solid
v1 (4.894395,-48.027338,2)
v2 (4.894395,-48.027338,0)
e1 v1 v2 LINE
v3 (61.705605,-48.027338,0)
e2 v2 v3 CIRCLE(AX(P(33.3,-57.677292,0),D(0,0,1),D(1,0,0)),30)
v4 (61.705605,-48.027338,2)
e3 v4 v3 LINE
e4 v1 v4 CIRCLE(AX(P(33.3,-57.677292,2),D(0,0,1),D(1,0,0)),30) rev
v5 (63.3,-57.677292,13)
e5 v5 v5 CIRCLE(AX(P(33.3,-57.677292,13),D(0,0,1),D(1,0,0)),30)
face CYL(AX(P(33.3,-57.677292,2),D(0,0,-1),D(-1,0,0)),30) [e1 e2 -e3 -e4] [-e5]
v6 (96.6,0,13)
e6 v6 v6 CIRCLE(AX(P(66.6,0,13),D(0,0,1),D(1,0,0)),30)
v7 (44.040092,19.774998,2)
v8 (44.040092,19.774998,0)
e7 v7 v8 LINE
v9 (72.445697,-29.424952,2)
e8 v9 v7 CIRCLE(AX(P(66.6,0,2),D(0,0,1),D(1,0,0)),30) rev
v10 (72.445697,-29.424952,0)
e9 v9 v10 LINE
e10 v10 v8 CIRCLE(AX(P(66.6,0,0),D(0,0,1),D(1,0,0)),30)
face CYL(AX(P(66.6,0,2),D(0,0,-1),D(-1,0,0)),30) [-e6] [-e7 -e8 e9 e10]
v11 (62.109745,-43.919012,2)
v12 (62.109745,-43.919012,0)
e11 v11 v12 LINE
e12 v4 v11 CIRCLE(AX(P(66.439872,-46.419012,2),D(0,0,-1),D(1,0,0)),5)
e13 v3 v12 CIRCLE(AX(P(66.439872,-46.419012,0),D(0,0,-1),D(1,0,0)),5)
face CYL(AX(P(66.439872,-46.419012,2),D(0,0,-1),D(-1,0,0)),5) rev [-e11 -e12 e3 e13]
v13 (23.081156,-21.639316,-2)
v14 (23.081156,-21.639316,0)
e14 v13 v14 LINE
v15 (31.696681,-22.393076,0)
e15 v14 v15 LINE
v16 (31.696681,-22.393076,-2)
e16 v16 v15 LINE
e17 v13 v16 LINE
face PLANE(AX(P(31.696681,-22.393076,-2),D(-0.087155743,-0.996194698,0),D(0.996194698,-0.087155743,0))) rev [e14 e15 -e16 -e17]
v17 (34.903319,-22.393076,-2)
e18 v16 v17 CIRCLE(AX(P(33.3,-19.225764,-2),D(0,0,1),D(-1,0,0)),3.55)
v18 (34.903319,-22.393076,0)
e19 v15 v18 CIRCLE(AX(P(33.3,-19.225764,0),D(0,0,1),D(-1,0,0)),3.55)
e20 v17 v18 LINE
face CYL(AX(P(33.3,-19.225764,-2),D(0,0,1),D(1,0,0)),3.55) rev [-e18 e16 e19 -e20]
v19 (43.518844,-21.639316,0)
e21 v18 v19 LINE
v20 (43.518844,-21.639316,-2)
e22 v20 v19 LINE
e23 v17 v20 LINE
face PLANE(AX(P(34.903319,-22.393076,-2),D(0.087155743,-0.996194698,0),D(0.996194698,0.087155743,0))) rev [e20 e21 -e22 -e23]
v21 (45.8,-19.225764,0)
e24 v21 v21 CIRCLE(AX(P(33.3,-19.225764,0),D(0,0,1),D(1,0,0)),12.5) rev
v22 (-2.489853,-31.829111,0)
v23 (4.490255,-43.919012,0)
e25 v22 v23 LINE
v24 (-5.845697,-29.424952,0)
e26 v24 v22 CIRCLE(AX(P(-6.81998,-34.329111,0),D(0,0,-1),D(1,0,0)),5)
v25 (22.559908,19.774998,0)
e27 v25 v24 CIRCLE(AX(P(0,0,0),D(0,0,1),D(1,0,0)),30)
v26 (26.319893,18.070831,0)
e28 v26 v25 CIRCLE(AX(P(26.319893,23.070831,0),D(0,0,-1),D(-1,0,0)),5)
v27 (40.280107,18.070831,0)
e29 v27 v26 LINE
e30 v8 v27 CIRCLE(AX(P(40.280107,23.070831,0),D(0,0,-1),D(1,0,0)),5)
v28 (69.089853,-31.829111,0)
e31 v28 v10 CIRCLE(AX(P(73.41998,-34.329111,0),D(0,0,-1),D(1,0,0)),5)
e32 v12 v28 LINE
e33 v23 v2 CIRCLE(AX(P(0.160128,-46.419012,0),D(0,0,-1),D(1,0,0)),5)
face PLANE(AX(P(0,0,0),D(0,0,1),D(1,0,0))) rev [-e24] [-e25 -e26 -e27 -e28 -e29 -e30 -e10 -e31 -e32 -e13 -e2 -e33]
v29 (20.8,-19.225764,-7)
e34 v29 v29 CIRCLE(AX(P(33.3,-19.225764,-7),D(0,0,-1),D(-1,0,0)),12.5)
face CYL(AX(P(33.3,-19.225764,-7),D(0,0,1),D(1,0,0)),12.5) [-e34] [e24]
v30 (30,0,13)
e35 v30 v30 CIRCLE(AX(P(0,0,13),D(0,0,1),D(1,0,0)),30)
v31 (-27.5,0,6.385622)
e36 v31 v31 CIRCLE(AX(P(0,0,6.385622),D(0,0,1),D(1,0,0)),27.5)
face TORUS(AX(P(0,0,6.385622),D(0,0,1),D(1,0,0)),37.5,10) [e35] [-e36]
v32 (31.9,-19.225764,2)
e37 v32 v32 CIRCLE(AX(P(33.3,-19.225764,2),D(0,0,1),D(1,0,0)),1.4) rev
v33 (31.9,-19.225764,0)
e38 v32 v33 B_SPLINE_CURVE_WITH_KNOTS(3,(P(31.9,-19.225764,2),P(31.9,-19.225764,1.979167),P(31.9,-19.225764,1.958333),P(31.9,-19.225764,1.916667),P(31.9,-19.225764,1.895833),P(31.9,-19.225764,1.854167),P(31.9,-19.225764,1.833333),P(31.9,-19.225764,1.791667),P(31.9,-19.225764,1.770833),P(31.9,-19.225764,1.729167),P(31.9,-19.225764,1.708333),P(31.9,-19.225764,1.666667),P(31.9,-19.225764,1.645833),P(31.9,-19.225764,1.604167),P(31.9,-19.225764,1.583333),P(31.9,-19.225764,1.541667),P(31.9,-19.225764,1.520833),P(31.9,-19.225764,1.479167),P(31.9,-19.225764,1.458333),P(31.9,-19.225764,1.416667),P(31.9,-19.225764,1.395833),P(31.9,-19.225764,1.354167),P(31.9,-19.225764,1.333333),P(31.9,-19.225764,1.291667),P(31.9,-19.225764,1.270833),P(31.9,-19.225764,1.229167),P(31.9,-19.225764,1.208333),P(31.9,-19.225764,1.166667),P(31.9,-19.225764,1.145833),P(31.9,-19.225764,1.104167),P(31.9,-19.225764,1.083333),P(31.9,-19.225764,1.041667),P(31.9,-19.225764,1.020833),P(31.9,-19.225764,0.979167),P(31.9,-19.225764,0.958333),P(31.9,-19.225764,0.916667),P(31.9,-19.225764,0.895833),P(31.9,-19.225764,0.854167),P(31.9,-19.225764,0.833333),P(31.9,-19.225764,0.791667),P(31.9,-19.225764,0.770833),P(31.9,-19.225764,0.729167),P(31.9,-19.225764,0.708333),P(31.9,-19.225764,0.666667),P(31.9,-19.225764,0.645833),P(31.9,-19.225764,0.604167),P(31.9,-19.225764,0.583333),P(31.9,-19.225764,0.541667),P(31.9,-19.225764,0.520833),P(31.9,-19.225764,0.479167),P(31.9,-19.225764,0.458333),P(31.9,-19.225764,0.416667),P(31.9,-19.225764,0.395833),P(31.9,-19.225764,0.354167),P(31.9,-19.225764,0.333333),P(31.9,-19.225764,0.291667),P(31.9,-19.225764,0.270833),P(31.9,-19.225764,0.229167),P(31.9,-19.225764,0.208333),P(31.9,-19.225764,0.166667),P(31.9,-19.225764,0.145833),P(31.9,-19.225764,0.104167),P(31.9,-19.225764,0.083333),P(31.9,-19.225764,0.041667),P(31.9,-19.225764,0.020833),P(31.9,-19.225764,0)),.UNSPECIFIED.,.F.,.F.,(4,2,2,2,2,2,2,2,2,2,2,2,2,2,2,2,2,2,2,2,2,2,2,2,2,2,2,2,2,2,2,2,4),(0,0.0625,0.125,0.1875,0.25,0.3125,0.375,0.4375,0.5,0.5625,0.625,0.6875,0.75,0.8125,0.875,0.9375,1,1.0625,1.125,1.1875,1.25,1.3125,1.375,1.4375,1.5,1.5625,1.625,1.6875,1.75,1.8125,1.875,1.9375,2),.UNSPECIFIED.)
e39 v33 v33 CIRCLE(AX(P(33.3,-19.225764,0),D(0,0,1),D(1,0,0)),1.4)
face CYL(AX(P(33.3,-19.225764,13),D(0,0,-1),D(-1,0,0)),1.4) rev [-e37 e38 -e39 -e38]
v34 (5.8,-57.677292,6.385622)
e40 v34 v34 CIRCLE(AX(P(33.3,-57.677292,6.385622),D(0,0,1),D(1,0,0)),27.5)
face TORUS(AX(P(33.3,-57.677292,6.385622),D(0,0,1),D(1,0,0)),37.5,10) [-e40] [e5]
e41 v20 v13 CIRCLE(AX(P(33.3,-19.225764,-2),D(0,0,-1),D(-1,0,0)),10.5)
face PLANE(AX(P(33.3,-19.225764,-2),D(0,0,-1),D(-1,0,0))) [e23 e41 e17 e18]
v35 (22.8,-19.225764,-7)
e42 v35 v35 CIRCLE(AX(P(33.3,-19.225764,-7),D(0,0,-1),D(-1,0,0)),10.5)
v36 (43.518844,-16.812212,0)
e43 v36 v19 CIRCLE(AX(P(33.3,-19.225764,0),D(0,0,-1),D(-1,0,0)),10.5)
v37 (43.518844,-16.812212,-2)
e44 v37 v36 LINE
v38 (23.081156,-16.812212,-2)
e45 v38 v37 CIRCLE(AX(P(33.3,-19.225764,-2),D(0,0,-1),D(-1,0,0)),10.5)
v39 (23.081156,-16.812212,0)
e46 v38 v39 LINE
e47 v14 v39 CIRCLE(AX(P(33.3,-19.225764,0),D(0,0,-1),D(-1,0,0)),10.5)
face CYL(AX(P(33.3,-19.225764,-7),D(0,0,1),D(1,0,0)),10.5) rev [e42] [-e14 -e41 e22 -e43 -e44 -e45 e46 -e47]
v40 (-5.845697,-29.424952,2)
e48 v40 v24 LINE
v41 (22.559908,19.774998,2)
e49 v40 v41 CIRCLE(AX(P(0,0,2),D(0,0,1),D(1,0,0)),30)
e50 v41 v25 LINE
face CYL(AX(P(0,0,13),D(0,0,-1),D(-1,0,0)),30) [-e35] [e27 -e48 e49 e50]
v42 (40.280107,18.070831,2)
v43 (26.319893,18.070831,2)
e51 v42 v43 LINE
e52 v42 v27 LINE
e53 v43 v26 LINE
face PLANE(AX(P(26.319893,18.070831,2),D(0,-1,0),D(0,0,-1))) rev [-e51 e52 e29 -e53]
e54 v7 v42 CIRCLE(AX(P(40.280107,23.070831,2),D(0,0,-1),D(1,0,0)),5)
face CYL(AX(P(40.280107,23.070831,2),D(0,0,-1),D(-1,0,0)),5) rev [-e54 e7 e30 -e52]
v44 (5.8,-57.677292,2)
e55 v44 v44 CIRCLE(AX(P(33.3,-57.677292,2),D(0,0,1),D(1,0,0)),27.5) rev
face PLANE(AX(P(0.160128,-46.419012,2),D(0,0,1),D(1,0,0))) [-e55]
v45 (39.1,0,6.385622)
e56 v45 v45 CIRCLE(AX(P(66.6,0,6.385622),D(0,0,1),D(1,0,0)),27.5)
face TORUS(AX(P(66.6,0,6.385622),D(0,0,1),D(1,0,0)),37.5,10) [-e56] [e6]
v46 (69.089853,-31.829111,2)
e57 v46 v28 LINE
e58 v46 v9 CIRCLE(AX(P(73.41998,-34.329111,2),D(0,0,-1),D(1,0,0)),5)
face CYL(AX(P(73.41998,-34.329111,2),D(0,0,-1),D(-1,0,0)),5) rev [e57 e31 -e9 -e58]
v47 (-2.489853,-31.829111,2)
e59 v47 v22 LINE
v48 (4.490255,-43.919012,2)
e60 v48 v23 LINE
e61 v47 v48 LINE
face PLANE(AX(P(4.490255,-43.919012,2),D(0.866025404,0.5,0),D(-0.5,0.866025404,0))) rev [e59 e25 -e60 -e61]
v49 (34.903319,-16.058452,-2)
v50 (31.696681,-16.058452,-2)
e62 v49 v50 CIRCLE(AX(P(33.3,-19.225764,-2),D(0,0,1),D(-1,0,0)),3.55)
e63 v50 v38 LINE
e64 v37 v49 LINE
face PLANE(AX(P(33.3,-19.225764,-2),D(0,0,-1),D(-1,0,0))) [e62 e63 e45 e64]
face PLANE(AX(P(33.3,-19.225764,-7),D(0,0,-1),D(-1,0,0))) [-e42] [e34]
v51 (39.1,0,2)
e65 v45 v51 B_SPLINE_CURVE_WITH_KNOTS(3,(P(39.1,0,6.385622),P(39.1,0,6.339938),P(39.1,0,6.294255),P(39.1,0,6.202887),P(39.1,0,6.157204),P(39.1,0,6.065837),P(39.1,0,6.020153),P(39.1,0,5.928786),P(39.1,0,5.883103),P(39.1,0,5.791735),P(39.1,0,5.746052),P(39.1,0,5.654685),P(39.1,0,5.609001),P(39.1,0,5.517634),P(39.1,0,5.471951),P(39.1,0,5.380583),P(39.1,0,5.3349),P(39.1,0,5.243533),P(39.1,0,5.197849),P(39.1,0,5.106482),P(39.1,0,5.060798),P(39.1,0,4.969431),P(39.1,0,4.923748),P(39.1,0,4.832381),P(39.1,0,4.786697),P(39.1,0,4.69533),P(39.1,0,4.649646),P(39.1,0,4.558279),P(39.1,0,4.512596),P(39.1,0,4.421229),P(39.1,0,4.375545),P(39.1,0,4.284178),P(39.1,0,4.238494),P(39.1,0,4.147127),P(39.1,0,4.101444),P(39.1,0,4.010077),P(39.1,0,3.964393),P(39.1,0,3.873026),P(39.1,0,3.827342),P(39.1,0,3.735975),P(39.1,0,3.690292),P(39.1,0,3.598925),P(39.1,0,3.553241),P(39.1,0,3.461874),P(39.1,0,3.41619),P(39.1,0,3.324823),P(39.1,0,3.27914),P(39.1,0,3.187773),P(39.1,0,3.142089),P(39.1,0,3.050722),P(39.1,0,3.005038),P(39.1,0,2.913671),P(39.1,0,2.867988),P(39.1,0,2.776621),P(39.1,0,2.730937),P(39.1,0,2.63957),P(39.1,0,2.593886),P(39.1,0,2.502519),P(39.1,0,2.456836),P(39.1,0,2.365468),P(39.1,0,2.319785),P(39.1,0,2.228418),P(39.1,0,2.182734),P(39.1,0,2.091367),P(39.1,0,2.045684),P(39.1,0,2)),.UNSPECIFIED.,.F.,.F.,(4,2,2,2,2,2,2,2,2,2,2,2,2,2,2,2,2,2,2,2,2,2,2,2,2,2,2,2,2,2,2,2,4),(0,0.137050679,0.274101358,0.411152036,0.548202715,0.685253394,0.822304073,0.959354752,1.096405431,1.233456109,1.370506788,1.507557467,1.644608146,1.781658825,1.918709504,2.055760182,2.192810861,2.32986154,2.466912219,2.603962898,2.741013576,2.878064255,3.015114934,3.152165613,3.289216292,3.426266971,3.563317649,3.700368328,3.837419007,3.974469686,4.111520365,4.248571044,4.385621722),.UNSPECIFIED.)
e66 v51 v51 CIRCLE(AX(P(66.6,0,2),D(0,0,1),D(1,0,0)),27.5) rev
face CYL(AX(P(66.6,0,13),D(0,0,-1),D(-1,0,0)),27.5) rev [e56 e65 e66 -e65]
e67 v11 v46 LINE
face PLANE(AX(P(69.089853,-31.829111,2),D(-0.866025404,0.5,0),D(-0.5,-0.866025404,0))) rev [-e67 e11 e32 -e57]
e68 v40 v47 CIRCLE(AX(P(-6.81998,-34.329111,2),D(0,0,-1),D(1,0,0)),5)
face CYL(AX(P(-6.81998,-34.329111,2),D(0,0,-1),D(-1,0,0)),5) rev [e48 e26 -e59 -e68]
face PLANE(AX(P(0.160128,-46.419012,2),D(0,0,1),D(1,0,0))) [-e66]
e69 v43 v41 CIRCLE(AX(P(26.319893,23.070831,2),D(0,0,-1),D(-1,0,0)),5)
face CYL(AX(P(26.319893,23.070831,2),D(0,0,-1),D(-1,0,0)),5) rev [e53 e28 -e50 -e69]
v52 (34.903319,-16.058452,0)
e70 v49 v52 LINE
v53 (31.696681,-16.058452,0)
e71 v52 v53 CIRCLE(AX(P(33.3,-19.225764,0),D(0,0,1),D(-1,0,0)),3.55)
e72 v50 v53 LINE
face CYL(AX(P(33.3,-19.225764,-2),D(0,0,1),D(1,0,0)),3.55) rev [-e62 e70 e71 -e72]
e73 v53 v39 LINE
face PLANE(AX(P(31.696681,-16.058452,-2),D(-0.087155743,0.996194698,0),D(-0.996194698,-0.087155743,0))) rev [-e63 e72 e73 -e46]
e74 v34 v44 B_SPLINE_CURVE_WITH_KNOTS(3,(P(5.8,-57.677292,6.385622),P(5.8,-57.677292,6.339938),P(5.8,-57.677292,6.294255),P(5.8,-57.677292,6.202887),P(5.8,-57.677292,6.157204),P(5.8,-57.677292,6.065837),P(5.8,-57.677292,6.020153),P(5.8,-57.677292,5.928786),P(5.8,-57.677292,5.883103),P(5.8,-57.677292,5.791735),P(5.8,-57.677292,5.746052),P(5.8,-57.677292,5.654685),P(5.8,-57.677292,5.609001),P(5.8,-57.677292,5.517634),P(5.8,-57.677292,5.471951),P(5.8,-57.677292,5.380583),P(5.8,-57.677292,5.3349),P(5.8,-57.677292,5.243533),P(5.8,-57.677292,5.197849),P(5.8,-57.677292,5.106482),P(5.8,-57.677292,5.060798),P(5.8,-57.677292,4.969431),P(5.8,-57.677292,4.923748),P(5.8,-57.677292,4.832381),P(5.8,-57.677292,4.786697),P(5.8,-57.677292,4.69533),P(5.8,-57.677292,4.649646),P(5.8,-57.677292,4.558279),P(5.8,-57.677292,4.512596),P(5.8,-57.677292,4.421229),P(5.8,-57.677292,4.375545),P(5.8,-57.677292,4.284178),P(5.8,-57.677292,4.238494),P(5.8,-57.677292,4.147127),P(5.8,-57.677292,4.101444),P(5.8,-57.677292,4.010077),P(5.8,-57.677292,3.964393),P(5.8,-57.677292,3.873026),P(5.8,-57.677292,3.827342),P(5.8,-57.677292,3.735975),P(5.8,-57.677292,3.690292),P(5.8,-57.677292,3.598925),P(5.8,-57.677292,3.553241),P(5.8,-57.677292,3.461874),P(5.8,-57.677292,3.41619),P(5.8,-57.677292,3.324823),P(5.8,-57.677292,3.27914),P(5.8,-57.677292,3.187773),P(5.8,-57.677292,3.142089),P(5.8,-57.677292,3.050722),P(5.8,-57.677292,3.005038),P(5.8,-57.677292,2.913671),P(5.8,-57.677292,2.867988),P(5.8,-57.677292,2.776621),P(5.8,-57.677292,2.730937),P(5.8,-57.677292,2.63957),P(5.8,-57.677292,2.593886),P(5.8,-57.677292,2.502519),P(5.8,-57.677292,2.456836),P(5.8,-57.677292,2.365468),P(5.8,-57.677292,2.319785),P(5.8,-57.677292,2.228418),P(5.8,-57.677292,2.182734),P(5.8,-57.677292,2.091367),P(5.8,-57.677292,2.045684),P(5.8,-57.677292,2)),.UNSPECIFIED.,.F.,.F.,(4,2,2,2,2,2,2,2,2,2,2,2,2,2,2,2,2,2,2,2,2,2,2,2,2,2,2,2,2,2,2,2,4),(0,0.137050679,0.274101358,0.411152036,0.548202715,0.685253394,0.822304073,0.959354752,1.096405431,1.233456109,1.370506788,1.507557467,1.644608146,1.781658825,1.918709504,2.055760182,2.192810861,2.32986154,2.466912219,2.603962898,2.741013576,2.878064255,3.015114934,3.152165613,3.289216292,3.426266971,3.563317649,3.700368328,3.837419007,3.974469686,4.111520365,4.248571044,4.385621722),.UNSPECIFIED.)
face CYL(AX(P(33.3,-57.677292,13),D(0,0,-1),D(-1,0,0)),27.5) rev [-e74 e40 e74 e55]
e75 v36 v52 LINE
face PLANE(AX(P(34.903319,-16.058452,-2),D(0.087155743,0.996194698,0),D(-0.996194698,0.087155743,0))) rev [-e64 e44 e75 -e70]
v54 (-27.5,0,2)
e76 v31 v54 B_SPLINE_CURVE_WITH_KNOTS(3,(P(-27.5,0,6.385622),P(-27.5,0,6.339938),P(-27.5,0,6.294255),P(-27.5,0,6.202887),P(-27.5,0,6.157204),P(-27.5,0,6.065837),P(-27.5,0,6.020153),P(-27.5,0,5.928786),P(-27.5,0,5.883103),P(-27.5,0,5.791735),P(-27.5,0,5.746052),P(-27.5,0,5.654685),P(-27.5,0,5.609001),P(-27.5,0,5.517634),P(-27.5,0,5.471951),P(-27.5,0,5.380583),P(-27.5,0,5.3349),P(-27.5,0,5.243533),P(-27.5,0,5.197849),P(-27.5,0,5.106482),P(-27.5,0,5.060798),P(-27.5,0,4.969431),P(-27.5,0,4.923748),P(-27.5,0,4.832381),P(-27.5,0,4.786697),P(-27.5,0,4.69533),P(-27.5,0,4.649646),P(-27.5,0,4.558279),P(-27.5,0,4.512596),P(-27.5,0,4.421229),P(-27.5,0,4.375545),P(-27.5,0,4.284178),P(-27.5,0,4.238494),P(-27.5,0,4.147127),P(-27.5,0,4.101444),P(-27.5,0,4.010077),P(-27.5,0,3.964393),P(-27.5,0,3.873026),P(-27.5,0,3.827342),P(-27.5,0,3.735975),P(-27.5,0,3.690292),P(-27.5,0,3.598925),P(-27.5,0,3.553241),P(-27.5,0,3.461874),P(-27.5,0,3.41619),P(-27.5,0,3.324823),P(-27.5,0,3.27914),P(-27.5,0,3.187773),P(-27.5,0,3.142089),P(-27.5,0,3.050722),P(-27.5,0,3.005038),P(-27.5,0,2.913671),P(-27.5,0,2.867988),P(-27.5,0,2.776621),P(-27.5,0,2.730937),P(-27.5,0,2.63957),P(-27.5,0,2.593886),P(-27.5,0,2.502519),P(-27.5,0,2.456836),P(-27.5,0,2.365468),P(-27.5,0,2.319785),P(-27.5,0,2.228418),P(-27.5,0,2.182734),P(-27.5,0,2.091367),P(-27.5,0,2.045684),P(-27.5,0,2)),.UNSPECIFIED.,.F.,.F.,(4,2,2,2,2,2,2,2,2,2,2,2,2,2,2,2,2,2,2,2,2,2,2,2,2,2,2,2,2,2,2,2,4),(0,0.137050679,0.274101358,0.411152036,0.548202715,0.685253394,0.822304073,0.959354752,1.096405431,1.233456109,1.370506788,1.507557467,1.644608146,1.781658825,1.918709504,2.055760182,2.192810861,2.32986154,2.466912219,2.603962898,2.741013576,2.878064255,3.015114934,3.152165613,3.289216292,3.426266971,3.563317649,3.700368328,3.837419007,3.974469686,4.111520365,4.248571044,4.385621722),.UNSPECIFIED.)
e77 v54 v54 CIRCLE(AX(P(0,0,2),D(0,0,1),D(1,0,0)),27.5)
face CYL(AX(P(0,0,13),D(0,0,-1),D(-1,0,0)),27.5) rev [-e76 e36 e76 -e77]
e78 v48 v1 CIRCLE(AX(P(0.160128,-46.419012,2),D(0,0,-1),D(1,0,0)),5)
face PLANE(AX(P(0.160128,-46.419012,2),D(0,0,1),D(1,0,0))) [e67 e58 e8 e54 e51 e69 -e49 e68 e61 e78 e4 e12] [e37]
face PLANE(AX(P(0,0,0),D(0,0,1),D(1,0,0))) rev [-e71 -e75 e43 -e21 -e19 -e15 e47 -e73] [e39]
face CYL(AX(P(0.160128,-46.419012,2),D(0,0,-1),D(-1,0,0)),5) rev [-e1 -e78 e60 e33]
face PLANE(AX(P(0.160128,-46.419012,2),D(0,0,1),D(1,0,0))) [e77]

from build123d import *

# Parameters (mm, degrees)
SKETCH_1_R          = 30
SKETCH_1_R_2        = 27.5
EXTRUDE_1_DEPTH     = 13
SKETCH_1_R_3        = 29.999999999999996
EXTRUDE_1_2_DEPTH   = 13
EXTRUDE_1_3_DEPTH   = 13
EXTRUDE_2_DEPTH     = 2
SKETCH_3_R          = 1.3999999999999955
CUT_EXTRUDE_5_DEPTH = 132.10250765535577
FILLET_1_R          = 10
SKETCH_5_R          = 12.500000000000002
SKETCH_5_R_2        = 10.5
EXTRUDE_3_DEPTH     = 7
EXTRUDE_4_DEPTH     = 2


with BuildPart() as part:
    # 草图1 → 凸台-拉伸1 (new body)
    with BuildSketch(Plane.XY):
        with Locations(Location((0, 0, 0), (0, 0, 180))):
            Circle(SKETCH_1_R)
        with Locations(Location((0, 0, 0), (0, 0, 180))):
            Circle(SKETCH_1_R_2, mode=Mode.SUBTRACT)
    extrude(amount=EXTRUDE_1_DEPTH)



with BuildPart() as body_2:
    # 草图1 → Extrude 1 2 (new body)
    with BuildSketch(Plane.XY):
        with Locations(Location((66.6, 0, 0), (0, 0, 180))):
            Circle(SKETCH_1_R_3)
        with Locations(Location((66.6, 0, 0), (0, 0, 180))):
            Circle(SKETCH_1_R_2, mode=Mode.SUBTRACT)
    extrude(amount=EXTRUDE_1_2_DEPTH)


with BuildPart() as body_3:
    # 草图1 → Extrude 1 3 (new body)
    with BuildSketch(Plane.XY):
        with Locations(Location((33.30000000000001, -57.6772918920436, 0), (0, 0, 180))):
            Circle(SKETCH_1_R_3)
        with Locations(Location((33.30000000000001, -57.6772918920436, 0), (0, 0, 180))):
            Circle(SKETCH_1_R_2, mode=Mode.SUBTRACT)
    extrude(amount=EXTRUDE_1_3_DEPTH)


with BuildPart() as part_1:
    add(part.part)

    add(body_2.part)  # 凸台-拉伸2 merges body 2

    add(body_3.part)  # 凸台-拉伸2 merges body 3
    # 草图2 → 凸台-拉伸2 (add)
    with BuildSketch(Plane.XY):
        with BuildLine():
            Line((26.3198925252566, 18.070831312697457), (40.280107474743396, 18.070831312697457))
            ThreePointArc((40.280107474743396, 18.070831312697457), (42.3441853289733, 18.516758123597654), (44.04009212120862, 19.77499826802639))
            ThreePointArc((44.04009212120862, 19.77499826802639), (92.58076211353317, 15), (72.44569692050842, -29.424952464083248))
            ThreePointArc((72.44569692050842, -29.424952464083248), (70.50807559525407, -30.264530756395246), (69.08985272167097, -31.829111208097117))
            Line((69.08985272167097, -31.829111208097117), (62.10974524692759, -43.91901199664395))
            ThreePointArc((62.10974524692759, -43.91901199664395), (61.46389026628078, -45.92951925924603), (61.70560479929982, -48.027337695986766))
            ThreePointArc((61.70560479929982, -48.027337695986766), (33.300000000000004, -87.6772918920436), (4.894395200700185, -48.02733769598677))
            ThreePointArc((4.894395200700185, -48.02733769598677), (5.13610973371921, -45.92951925924604), (4.4902547530724135, -43.91901199664397))
            Line((4.4902547530724135, -43.91901199664397), (-2.489852721670984, -31.829111208097103))
            ThreePointArc((-2.489852721670984, -31.829111208097103), (-3.9080755952540875, -30.264530756395228), (-5.845696920508439, -29.42495246408323))
            ThreePointArc((-5.845696920508439, -29.42495246408323), (-25.980762113533153, 15.000000000000009), (22.55990787879137, 19.77499826802639))
            ThreePointArc((22.55990787879137, 19.77499826802639), (24.25581467102669, 18.516758123597654), (26.3198925252566, 18.070831312697457))
        make_face()
    extrude(amount=EXTRUDE_2_DEPTH)

    # 草图3 → 切除-拉伸5 (cut, through all)
    with BuildSketch(Plane.XY):
        with Locations(Location((33.3, -19.225763964014533, 0), (0, 0, 180))):
            Circle(SKETCH_3_R)
    extrude(amount=CUT_EXTRUDE_5_DEPTH, mode=Mode.SUBTRACT)

    # 圆角1
    # the kernel refuses this fillet: 10 mm, written as the material it takes off along each edge
    with BuildSketch(Plane(origin=(0, 0, 13), x_dir=(-1, 1.2e-16, 0), z_dir=(1.2e-16, 1, 0))) as fillet_1_piece_1:
        with BuildLine():
            CenterArc((37.5, -6.614378277661482), FILLET_1_R, 138.59037789072914, 41.409622109270856)
            Line((27.5, -6.614378277661482), (27.3, -6.614378277661482))
            Line((27.3, -6.614378277661482), (27.3, 0))
            Line((27.3, 0), (27.5, 0.1999999999999993))
            ThreePointArc((27.5, 0.1999999999999993), (28.75, 0.1999999999999993), (29.85, 0.1322875655532254))
            Line((29.85, 0.1322875655532254), (30, -3.55e-15))
        make_face()
    revolve(axis=Axis((0, 0, 13), (0, 0, 1)), mode=Mode.SUBTRACT)
    with BuildSketch(Plane(origin=(66.6, 0, 13), x_dir=(-1, 1.2e-16, 0), z_dir=(1.2e-16, 1, 0))) as fillet_1_piece_2:
        with BuildLine():
            CenterArc((37.5, -6.614378277661482), FILLET_1_R, 138.59037789072914, 41.409622109270856)
            Line((27.5, -6.614378277661482), (27.299999999999997, -6.614378277661482))
            Line((27.299999999999997, -6.614378277661482), (27.299999999999997, 0))
            Line((27.299999999999997, 0), (27.5, 0.1999999999999993))
            ThreePointArc((27.5, 0.1999999999999993), (28.75, 0.1999999999999993), (29.85, 0.1322875655532254))
            Line((29.85, 0.1322875655532254), (30, -3.55e-15))
        make_face()
    revolve(axis=Axis((66.6, 0, 13), (0, 0, 1)), mode=Mode.SUBTRACT)
    with BuildSketch(Plane(origin=(33.30000000000001, -57.6772918920436, 13), x_dir=(-1, 0, 0), z_dir=(0, 1, 0))) as fillet_1_piece_3:
        with BuildLine():
            CenterArc((37.5, -6.614378277661478), FILLET_1_R, 138.59037789072914, 41.409622109270856)
            Line((27.5, -6.614378277661478), (27.3, -6.614378277661478))
            Line((27.3, -6.614378277661478), (27.3, 0))
            Line((27.3, 0), (27.5, 0.1999999999999993))
            ThreePointArc((27.5, 0.1999999999999993), (28.75, 0.1999999999999993), (29.849999999999998, 0.1322875655532254))
            Line((29.849999999999998, 0.1322875655532254), (30, -3.55e-15))
        make_face()
    revolve(axis=Axis((33.30000000000001, -57.6772918920436, 13), (0, 0, 1)), mode=Mode.SUBTRACT)

    # 草图5 → 凸台-拉伸3 (add)
    with BuildSketch(Plane(origin=(0, 0, 0), x_dir=(-1, 0, 0), z_dir=(0, 0, -1))):
        with Locations(Location((-33.3, -19.225763964014533, 0), (0, 0, 180))):
            Circle(SKETCH_5_R)
        with Locations((-33.3, -19.225763964014533)):
            Circle(SKETCH_5_R_2, mode=Mode.SUBTRACT)
    extrude(amount=EXTRUDE_3_DEPTH)

    # 草图6 → 凸台-拉伸4 (add)
    with BuildSketch(Plane(origin=(0, 0, 0), x_dir=(-1, 0, 0), z_dir=(0, 0, -1))):
        with BuildLine():
            Line((-34.90331925395002, -16.05845163809636), (-43.51884380379272, -16.812212366536837))
            ThreePointArc((-43.51884380379272, -16.812212366536837), (-33.3, -8.725763964014526), (-23.08115619620727, -16.812212366536837))
            Line((-23.08115619620727, -16.812212366536837), (-31.69668074604997, -16.05845163809636))
            ThreePointArc((-31.69668074604997, -16.05845163809636), (-33.3, -15.675763964014527), (-34.90331925395002, -16.05845163809636))
        make_face()
        with BuildLine():
            Line((-34.90331925395002, -22.3930762899327), (-43.51884380379272, -21.63931556149223))
            ThreePointArc((-43.51884380379272, -21.63931556149223), (-33.3, -29.725763964014536), (-23.08115619620727, -21.63931556149223))
            Line((-23.08115619620727, -21.63931556149223), (-31.69668074604997, -22.3930762899327))
            ThreePointArc((-31.69668074604997, -22.3930762899327), (-33.3, -22.775763964014537), (-34.90331925395002, -22.3930762899327))
        make_face()
    extrude(amount=EXTRUDE_4_DEPTH)


solid = part_1.part
